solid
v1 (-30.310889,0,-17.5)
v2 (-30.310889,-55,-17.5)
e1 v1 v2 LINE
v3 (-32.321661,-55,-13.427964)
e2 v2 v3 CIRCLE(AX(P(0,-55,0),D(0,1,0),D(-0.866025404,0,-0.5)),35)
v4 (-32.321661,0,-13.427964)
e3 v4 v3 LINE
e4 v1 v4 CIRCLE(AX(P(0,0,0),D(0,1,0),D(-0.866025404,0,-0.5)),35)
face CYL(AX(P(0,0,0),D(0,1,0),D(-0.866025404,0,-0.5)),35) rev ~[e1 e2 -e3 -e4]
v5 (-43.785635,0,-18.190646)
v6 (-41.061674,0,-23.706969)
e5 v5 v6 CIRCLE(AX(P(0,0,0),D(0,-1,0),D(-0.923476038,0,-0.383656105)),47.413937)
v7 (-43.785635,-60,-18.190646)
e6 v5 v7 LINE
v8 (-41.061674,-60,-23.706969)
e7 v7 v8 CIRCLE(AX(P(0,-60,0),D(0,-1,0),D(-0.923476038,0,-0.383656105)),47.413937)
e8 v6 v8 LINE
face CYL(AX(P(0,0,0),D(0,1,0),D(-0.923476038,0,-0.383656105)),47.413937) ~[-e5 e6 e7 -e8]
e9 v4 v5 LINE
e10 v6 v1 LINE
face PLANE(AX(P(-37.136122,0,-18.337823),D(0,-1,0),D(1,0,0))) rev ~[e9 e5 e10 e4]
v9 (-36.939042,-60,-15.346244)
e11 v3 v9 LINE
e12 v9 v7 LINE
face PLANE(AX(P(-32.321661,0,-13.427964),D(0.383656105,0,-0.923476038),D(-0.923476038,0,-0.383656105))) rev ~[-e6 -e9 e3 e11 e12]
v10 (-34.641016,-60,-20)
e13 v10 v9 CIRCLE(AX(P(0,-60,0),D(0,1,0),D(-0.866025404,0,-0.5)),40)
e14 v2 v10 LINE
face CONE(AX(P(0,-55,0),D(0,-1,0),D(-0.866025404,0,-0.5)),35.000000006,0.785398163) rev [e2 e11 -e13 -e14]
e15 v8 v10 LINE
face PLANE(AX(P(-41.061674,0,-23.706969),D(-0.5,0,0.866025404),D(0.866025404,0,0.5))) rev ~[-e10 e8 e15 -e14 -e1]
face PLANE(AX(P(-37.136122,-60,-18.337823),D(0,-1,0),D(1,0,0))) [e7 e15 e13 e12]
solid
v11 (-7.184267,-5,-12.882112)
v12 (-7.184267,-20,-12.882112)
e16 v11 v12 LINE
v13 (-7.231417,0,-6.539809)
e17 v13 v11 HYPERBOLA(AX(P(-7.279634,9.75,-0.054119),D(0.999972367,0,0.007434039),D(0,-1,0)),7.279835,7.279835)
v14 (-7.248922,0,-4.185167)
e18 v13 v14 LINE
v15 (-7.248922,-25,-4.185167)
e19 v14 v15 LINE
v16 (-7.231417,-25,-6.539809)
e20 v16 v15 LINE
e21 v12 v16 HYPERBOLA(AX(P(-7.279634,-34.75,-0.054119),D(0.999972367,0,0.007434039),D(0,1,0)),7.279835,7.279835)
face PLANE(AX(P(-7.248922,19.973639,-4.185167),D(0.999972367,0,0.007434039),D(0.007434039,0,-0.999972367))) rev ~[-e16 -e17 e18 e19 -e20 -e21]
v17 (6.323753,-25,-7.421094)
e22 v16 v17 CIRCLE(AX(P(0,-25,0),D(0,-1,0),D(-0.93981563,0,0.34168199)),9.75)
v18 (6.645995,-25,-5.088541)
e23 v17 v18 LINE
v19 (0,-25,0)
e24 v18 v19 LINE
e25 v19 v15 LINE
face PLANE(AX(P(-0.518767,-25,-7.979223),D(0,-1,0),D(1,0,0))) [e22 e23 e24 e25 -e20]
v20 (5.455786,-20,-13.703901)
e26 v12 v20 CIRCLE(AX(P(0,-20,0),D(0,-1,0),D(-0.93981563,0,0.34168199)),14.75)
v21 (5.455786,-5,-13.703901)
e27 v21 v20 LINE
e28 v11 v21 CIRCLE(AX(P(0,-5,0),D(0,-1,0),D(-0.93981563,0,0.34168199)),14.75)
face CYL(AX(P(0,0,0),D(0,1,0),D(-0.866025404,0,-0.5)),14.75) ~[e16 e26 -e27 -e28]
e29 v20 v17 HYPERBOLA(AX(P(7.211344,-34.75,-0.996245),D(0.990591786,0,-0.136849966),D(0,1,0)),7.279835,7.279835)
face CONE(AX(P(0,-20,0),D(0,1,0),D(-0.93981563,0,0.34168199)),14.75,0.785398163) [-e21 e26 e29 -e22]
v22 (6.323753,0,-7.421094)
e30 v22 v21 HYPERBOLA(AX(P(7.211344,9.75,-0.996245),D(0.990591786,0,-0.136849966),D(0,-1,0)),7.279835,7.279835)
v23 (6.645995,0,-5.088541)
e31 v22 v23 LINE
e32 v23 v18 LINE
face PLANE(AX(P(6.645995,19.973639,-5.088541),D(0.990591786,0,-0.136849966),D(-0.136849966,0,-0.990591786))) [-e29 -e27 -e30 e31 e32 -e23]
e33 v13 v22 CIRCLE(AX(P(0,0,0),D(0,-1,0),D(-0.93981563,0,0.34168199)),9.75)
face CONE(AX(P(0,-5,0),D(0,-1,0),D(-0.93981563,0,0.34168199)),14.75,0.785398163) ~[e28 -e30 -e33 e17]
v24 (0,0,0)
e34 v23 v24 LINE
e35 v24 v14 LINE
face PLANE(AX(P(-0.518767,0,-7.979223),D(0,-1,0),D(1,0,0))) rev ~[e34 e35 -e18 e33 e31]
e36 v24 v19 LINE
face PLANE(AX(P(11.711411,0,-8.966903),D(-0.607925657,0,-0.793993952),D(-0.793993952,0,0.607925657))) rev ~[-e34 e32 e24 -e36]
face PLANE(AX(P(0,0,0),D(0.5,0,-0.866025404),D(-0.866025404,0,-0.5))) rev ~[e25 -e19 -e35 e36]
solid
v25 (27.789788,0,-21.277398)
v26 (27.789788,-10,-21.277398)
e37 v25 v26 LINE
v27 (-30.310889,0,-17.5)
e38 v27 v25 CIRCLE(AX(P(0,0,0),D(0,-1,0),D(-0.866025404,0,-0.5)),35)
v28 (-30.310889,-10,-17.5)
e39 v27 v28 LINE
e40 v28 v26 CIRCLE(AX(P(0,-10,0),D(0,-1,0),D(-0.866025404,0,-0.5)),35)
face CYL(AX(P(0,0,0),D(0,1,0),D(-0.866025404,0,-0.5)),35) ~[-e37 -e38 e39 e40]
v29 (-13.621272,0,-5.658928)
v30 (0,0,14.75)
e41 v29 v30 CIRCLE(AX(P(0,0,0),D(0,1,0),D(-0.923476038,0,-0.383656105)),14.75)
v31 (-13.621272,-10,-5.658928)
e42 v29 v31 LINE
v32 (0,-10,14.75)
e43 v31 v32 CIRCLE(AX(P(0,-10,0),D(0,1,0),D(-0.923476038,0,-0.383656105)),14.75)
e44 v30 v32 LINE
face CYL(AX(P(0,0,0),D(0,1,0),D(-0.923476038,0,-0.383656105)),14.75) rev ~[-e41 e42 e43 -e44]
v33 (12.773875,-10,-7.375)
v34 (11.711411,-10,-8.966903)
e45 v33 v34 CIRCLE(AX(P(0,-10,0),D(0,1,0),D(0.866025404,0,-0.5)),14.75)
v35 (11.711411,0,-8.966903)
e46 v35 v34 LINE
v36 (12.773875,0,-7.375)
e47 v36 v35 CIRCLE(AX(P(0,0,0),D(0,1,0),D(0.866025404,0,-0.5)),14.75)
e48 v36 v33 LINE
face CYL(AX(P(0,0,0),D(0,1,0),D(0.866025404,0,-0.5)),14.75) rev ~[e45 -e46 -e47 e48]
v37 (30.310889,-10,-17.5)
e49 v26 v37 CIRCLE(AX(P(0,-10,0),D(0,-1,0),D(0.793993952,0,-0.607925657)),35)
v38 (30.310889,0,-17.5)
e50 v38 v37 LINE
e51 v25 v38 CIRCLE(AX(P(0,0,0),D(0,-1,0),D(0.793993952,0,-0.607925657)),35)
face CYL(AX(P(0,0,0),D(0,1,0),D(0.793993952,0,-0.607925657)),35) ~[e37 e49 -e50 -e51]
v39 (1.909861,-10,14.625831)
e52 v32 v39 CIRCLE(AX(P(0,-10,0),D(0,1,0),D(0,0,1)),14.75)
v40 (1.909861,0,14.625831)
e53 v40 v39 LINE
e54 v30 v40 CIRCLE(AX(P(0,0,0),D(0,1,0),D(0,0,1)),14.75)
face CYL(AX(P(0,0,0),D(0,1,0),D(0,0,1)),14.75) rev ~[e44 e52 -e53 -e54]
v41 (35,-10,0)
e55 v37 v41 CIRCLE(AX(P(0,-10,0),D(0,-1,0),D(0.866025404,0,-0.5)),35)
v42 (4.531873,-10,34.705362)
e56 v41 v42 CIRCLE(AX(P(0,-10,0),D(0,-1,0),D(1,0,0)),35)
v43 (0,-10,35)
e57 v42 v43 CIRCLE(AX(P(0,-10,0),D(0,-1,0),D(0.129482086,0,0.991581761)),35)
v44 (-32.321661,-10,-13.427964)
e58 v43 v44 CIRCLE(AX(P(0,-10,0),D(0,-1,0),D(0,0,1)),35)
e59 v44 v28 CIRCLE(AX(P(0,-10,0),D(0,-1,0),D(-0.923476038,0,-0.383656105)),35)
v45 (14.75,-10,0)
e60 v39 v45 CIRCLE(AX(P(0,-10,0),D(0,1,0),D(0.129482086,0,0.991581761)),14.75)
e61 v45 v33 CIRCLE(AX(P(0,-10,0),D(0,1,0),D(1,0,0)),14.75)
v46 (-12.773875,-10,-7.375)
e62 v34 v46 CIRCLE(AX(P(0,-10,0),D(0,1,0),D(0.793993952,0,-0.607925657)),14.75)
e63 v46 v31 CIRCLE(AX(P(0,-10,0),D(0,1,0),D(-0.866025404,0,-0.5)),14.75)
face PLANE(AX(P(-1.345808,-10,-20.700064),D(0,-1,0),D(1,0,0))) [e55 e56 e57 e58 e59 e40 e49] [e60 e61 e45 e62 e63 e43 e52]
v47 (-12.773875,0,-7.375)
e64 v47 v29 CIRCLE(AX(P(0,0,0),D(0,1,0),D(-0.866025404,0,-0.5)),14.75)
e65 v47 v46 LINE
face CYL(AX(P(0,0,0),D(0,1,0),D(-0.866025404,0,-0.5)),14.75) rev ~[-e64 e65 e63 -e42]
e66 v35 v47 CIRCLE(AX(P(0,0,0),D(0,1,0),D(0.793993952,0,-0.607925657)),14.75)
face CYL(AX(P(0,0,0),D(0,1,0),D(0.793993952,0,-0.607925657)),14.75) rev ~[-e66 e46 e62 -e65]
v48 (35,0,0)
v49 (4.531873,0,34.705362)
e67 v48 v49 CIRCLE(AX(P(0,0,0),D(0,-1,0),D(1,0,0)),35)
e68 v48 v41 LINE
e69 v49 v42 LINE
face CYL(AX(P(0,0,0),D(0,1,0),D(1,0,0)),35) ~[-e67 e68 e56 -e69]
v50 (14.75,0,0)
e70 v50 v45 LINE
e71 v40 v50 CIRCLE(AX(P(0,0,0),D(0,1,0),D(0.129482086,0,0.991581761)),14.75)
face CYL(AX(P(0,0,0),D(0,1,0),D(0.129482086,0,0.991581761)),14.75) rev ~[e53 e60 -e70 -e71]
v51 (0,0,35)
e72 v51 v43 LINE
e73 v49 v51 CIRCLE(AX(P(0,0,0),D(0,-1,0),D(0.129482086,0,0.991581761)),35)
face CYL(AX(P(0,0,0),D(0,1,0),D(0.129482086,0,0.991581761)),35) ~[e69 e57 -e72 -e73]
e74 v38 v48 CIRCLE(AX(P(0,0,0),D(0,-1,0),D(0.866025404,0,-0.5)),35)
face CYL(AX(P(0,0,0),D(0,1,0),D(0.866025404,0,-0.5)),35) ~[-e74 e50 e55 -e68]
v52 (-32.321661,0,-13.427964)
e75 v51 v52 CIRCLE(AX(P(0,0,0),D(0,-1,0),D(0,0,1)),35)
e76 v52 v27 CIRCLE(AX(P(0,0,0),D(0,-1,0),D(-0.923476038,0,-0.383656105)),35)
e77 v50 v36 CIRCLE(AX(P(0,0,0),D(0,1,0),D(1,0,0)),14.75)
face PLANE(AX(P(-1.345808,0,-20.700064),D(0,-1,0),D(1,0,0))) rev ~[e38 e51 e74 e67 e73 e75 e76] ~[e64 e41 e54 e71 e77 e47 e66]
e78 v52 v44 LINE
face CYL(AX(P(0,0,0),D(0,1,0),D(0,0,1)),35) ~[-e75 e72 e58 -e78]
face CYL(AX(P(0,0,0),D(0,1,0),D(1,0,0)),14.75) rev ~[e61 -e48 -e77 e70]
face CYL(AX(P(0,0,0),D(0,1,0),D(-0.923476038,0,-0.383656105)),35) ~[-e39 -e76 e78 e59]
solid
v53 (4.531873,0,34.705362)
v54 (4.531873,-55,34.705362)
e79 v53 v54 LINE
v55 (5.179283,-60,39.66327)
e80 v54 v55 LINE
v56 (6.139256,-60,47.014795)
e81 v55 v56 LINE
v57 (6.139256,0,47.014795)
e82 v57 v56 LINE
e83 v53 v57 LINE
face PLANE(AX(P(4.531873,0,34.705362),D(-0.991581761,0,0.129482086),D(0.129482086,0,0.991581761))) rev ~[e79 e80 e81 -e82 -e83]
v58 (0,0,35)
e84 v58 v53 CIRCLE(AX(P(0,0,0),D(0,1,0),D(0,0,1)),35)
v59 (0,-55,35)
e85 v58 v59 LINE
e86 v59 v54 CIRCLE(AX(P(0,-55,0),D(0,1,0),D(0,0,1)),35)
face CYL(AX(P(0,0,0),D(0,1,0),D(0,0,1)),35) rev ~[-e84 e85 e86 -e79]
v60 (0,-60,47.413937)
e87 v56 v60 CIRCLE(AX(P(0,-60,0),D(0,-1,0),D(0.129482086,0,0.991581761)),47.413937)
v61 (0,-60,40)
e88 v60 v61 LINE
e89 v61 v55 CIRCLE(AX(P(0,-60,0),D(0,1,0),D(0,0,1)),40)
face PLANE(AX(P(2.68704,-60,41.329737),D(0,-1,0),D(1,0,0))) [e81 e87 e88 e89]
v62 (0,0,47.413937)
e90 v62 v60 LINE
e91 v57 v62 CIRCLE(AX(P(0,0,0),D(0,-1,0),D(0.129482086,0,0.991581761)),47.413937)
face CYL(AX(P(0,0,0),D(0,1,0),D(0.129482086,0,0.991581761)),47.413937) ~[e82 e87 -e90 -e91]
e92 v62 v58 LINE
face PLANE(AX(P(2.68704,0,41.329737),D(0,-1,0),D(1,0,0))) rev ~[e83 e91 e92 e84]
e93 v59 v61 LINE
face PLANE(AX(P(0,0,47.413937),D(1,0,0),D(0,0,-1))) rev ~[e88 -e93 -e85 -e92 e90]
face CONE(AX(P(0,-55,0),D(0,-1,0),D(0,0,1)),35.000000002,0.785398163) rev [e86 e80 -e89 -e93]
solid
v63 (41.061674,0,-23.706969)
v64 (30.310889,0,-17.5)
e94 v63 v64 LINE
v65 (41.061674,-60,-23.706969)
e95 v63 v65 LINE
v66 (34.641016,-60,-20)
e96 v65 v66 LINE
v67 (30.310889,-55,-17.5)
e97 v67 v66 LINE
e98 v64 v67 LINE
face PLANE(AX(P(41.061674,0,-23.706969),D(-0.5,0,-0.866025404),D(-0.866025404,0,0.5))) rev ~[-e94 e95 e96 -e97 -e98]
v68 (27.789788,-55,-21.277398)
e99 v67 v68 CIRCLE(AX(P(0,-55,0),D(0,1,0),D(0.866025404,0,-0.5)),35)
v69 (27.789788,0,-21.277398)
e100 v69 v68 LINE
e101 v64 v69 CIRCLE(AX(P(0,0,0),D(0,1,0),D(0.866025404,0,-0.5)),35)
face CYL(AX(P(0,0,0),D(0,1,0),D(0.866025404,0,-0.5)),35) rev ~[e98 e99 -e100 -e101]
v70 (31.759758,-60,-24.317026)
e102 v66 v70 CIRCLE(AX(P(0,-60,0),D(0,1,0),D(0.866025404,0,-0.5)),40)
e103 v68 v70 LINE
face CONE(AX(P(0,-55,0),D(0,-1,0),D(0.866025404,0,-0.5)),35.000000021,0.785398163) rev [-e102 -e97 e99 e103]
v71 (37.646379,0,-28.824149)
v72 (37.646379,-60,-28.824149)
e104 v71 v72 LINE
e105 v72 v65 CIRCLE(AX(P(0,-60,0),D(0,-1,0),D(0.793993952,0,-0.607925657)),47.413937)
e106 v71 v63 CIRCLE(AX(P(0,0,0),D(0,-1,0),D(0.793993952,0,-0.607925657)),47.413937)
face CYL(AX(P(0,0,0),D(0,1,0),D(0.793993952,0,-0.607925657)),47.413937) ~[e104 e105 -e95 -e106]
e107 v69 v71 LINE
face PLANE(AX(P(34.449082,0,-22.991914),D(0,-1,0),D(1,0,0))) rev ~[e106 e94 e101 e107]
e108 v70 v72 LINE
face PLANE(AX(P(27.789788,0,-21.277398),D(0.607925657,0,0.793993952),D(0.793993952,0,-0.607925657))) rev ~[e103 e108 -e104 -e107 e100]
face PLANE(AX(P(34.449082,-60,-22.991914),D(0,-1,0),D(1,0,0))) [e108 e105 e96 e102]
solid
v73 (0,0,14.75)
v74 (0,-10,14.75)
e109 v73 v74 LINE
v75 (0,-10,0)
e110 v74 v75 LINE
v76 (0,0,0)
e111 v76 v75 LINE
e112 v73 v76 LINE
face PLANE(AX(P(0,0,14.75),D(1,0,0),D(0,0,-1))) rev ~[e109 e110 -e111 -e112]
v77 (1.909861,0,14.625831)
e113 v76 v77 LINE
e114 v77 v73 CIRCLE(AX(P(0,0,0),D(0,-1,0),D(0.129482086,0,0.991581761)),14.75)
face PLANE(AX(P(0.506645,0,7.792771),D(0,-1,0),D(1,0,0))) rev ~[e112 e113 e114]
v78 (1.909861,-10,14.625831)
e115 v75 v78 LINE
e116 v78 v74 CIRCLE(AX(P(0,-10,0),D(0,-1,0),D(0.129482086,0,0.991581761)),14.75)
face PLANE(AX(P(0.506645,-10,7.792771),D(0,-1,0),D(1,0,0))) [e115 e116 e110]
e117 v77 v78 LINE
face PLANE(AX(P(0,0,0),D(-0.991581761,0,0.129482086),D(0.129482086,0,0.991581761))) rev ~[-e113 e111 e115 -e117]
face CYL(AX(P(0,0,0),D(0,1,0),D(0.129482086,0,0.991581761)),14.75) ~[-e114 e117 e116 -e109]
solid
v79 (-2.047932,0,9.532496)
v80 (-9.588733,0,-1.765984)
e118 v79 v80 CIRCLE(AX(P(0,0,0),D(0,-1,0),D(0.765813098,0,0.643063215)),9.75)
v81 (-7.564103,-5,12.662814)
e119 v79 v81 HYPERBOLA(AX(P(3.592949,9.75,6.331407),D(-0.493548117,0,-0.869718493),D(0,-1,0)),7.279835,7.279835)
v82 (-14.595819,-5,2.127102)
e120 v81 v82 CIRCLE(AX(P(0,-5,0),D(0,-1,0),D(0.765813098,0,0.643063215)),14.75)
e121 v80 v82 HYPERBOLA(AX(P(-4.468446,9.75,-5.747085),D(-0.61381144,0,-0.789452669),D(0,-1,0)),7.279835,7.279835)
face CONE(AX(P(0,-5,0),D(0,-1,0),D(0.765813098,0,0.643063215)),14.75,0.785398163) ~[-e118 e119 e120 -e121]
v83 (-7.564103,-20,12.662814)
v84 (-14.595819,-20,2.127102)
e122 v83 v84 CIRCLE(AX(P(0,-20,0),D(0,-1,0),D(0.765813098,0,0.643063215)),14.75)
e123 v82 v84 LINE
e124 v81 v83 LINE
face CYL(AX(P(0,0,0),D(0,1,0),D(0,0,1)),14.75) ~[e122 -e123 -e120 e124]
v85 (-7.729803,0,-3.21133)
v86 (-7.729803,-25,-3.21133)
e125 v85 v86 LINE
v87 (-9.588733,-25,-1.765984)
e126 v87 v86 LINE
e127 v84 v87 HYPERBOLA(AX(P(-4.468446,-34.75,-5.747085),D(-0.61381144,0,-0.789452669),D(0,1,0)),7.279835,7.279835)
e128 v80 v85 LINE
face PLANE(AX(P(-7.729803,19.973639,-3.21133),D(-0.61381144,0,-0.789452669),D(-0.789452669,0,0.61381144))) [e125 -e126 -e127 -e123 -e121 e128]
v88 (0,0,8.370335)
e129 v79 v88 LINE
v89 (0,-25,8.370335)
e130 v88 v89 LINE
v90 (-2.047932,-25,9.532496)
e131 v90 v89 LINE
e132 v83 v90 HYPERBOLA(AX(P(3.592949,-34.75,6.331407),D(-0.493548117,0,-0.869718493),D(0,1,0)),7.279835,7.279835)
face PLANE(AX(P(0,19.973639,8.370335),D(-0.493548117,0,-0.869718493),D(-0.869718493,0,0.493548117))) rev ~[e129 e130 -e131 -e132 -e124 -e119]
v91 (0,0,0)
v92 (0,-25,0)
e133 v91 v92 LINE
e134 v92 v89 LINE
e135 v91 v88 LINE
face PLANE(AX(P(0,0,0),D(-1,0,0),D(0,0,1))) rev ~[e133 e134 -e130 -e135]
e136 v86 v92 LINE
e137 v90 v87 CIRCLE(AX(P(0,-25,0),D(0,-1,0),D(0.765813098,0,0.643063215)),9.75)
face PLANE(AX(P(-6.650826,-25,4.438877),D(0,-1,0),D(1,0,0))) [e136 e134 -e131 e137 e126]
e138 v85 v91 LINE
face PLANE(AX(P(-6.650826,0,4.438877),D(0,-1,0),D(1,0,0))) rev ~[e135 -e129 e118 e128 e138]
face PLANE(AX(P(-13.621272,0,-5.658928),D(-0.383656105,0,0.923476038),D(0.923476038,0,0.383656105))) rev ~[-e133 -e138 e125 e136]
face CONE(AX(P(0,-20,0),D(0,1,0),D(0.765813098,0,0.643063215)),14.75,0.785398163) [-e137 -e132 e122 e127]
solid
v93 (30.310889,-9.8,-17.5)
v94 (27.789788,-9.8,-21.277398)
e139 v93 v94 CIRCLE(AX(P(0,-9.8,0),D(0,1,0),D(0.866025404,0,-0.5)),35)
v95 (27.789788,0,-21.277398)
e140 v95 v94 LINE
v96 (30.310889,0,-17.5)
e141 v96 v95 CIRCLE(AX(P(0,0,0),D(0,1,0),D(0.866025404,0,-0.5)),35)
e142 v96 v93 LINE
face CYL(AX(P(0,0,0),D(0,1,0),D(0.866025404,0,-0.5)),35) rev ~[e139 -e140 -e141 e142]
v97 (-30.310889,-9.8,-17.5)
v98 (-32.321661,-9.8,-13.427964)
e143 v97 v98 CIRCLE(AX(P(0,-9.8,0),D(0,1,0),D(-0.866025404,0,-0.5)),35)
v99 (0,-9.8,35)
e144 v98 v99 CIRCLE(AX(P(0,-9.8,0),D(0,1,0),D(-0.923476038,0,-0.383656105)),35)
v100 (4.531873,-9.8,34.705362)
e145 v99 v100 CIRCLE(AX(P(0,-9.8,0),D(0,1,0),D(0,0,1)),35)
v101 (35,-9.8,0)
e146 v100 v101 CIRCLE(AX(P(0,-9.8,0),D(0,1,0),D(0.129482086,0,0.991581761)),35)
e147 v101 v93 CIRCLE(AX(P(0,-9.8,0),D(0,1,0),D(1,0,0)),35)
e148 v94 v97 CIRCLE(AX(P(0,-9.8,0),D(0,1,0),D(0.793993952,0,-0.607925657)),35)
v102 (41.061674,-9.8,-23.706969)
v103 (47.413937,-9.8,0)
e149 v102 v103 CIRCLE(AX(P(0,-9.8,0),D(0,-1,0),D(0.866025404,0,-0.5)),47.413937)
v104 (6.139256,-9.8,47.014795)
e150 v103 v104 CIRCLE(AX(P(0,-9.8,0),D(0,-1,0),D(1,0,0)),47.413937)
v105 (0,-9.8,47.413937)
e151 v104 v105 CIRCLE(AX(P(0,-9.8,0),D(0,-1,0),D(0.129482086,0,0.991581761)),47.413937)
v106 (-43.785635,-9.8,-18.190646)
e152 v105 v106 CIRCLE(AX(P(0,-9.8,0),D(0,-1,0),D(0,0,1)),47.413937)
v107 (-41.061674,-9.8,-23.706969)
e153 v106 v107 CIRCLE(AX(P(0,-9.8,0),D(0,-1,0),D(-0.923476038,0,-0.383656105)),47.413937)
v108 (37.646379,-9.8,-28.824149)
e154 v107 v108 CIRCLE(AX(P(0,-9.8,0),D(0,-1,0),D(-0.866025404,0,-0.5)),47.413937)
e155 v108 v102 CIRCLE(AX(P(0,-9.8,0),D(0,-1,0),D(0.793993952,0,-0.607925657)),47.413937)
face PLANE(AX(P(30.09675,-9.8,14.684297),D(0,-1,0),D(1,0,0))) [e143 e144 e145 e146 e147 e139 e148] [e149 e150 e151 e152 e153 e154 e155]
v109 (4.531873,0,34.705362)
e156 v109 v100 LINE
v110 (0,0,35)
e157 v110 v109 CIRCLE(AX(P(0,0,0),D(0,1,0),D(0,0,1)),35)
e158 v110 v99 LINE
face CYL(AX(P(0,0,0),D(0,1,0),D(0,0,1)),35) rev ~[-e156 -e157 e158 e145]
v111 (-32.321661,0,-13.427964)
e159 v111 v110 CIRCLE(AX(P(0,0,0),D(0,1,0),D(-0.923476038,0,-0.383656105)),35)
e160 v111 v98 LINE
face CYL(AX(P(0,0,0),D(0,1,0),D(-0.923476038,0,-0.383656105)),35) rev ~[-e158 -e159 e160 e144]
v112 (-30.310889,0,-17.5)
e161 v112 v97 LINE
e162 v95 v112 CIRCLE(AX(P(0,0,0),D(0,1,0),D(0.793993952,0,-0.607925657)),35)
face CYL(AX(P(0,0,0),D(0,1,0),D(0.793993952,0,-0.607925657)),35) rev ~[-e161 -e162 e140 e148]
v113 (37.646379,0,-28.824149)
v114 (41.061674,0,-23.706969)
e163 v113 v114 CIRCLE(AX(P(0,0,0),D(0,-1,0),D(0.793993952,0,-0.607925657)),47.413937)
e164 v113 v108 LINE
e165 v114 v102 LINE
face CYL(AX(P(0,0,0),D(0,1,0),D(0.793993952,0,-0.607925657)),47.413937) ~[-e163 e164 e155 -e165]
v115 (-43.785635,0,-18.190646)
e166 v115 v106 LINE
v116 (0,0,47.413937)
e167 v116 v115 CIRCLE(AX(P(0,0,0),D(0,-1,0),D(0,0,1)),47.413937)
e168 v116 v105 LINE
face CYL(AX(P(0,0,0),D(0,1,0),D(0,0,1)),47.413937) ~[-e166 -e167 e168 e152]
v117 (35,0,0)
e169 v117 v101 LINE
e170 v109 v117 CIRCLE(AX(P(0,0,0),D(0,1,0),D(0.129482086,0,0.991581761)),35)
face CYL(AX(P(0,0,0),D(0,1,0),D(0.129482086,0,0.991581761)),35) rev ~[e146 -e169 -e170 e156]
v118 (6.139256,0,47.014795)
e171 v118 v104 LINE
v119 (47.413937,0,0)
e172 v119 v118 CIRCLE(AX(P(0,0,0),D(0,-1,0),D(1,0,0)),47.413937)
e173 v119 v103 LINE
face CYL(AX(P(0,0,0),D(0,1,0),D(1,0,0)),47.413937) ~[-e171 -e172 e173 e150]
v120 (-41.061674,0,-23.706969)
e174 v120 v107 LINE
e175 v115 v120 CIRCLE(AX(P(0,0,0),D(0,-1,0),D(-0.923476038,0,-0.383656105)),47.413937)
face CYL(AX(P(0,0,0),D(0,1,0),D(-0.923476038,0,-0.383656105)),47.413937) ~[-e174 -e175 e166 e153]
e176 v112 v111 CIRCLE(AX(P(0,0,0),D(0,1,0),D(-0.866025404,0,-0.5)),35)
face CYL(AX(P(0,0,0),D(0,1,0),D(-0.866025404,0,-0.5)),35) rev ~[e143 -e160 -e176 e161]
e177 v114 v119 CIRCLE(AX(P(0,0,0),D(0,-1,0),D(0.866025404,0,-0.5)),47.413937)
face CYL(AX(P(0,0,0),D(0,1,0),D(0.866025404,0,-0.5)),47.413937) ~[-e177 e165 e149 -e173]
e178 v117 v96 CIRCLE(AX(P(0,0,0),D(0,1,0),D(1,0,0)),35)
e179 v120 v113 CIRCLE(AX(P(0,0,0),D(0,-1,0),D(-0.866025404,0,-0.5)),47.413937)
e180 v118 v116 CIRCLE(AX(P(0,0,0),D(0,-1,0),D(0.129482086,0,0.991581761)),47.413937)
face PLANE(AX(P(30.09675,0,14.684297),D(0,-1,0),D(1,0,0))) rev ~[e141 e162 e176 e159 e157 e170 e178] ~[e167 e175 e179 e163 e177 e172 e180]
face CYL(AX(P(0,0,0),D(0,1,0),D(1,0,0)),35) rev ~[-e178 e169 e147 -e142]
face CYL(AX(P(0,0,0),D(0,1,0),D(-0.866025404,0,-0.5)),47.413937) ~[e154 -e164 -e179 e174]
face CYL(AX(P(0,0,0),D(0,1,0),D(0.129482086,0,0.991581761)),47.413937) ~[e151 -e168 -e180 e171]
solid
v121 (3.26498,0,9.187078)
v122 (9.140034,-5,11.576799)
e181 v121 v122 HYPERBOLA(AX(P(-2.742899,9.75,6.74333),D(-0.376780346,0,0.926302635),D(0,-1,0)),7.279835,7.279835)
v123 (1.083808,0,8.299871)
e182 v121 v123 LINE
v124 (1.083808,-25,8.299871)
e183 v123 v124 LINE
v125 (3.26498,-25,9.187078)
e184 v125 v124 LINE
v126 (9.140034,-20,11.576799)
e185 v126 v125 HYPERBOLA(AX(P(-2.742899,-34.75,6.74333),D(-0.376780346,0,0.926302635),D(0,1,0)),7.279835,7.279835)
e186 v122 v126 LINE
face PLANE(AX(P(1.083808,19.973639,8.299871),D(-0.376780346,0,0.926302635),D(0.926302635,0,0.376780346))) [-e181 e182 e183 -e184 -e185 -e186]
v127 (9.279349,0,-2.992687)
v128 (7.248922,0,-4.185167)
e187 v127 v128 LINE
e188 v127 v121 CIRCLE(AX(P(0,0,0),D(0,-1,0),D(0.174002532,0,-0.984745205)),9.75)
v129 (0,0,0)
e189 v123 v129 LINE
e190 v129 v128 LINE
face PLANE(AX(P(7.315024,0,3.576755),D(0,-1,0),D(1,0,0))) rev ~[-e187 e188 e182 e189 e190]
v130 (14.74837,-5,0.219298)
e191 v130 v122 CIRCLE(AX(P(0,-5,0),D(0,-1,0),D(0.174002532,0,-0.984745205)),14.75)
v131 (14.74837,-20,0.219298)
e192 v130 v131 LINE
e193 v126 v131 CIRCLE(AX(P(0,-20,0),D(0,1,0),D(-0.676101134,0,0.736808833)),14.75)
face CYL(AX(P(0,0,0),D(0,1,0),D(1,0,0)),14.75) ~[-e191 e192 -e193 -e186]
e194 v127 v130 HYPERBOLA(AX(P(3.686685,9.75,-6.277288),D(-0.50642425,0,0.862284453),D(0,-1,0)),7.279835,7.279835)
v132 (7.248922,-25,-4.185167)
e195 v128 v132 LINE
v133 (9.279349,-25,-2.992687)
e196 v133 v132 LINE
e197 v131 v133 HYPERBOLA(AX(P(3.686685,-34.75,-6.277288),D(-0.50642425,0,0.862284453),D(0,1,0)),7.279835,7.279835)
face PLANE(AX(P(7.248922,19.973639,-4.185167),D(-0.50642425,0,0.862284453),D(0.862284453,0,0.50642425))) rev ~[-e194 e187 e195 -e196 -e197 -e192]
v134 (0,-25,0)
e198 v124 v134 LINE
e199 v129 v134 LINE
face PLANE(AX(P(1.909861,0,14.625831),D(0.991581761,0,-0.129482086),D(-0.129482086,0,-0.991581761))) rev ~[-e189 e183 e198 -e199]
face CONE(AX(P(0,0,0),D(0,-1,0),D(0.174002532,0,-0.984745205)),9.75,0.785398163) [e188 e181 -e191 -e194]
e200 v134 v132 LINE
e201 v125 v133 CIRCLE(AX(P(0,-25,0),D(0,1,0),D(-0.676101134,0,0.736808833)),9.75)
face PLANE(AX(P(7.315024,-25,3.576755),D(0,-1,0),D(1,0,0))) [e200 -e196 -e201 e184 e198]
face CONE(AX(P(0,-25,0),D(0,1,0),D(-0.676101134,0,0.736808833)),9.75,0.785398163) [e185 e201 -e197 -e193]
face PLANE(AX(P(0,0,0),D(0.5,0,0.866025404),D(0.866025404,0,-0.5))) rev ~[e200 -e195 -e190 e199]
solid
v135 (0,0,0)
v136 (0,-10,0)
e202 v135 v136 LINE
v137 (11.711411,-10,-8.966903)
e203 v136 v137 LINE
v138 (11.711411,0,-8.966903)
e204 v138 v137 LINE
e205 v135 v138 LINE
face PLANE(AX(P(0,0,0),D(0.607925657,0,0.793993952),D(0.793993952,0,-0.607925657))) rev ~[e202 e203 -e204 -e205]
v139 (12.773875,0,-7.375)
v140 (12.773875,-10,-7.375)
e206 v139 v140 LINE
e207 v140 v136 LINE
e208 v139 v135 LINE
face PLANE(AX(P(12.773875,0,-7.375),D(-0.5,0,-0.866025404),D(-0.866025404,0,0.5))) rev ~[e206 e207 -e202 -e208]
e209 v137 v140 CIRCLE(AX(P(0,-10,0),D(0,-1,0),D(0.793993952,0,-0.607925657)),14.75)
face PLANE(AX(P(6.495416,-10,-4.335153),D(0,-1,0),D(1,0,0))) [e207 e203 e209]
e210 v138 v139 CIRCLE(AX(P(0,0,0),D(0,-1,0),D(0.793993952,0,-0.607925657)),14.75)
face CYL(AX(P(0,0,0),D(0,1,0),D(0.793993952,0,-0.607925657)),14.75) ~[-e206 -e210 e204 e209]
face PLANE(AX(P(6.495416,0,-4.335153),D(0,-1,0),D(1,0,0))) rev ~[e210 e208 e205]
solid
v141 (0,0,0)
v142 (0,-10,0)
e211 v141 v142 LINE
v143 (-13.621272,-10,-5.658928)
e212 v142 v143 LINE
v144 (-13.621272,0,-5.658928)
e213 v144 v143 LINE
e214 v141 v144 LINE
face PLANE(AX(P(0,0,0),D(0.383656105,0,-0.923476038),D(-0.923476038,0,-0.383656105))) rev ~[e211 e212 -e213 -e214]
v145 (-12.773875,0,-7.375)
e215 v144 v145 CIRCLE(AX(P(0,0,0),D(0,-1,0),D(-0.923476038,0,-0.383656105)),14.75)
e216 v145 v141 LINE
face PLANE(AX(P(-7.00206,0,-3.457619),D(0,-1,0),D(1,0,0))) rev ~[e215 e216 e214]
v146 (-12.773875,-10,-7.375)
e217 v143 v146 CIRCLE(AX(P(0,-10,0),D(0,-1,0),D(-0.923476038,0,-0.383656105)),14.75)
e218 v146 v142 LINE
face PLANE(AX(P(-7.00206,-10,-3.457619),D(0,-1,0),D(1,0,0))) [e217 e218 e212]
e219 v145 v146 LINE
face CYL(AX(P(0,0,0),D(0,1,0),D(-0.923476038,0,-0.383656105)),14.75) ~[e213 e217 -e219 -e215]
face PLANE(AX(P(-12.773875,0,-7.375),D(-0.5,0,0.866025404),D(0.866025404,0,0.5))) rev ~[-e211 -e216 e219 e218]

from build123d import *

# Parameters (mm, degrees)
F1_DEPTH      = 60
F2_DEPTH      = 9.8
F3_DEPTH      = 25
F4_DEPTH      = 10
F5_DEPTH      = 10
F6_T1_DEPTH   = 64.9472775058
F6_T4_ANGLE   = 212.5191011757
F6_T6_ANGLE   = 212.5191011757
F6_2_T1_DEPTH = 64.9472775058
F6_2_T4_ANGLE = 212.5191011757
F6_2_T6_ANGLE = 212.5191011757
F6_3_T1_DEPTH = 64.9472775058
F6_3_T4_ANGLE = 212.5191011757
F6_3_T6_ANGLE = 212.5191011757
F7_SIZE       = 5
F7_2_SIZE     = 5
F7_3_SIZE     = 5


# Not quite as in the source:
# - a fillet or chamfer that OpenCascade refuses, or shapes differently, is made with other operations: its cross-section is extruded or revolved along the edge and cut away or added


with BuildPart() as f1:
    # F0 (on Front) → F1 (new body)
    with BuildSketch(Plane.XZ):
        with BuildLine():
            ThreePointArc((0, 35), (2.2707204157, 34.9262627373), (4.5318730195, 34.7053616454))
            Line((4.5318730195, 34.7053616454), (6.1392555161, 47.0147954288))
            ThreePointArc((6.1392555161, 47.0147954288), (3.0761084385, 47.3140465864), (0, 47.4139372706))
            Line((0, 47.4139372706), (0, 35))
        make_face()
    extrude(amount=F1_DEPTH)

    # F7
    f7_edges = [f1.edges().sort_by_distance(p)[0] for p in [
        (2.27072, -60, 34.926263),
    ]]
    chamfer(f7_edges, length=F7_SIZE)


with BuildPart() as f1b:
    # F0 (on Front) → F1, piece 2 (new body)
    with BuildSketch(Plane.XZ):
        with BuildLine():
            Line((41.0616741698, -23.7069686353), (30.3108891325, -17.5))
            ThreePointArc((30.3108891325, -17.5), (29.1116705819, -19.4296329335), (27.7897883227, -21.2773979843))
            Line((27.7897883227, -21.2773979843), (37.646379437, -28.8241489517))
            ThreePointArc((37.646379437, -28.8241489517), (39.4371120804, -26.3210113457), (41.0616741698, -23.7069686353))
        make_face()
    extrude(amount=F1_DEPTH)

    # F7#2
    f7_2_edges = [f1b.edges().sort_by_distance(p)[0] for p in [
        (29.111671, -60, -19.429633),
    ]]
    chamfer(f7_2_edges, length=F7_2_SIZE)


with BuildPart() as f1c:
    # F0 (on Front) → F1, piece 3 (new body)
    with BuildSketch(Plane.XZ):
        with BuildLine():
            ThreePointArc((-30.3108891325, -17.5), (-31.3823909976, -15.4966298038), (-32.3216613422, -13.4279636611))
            Line((-32.3216613422, -13.4279636611), (-43.7856349531, -18.1906464771))
            ThreePointArc((-43.7856349531, -18.1906464771), (-42.5132205189, -20.9930352406), (-41.0616741698, -23.7069686353))
            Line((-41.0616741698, -23.7069686353), (-30.3108891325, -17.5))
        make_face()
    extrude(amount=F1_DEPTH)

    # F7#3
    f7_3_edges = [f1c.edges().sort_by_distance(p)[0] for p in [
        (-31.382391, -60, -15.49663),
    ]]
    chamfer(f7_3_edges, length=F7_3_SIZE)


with BuildPart() as f2:
    # F0 (on Front) → F2 (new body)
    with BuildSketch(Plane.XZ):
        with BuildLine():
            ThreePointArc((4.5318730195, 34.7053616454), (26.3022390271, 23.0909554189), (35, 0))
            ThreePointArc((35, 0), (33.8074039201, -9.0586665786), (30.3108891325, -17.5))
            Line((30.3108891325, -17.5), (41.0616741698, -23.7069686353))
            ThreePointArc((41.0616741698, -23.7069686353), (45.7983465358, -12.2716299689), (47.4139372706, 0))
            ThreePointArc((47.4139372706, 0), (35.6312203232, 31.2809460501), (6.1392555161, 47.0147954288))
            Line((6.1392555161, 47.0147954288), (4.5318730195, 34.7053616454))
        make_face()
        with BuildLine():
            ThreePointArc((0, 35), (2.2707204157, 34.9262627373), (4.5318730195, 34.7053616454))
            Line((4.5318730195, 34.7053616454), (6.1392555161, 47.0147954288))
            ThreePointArc((6.1392555161, 47.0147954288), (3.0761084385, 47.3140465864), (0, 47.4139372706))
            Line((0, 47.4139372706), (0, 35))
        make_face()
        with BuildLine():
            Line((41.0616741698, -23.7069686353), (30.3108891325, -17.5))
            ThreePointArc((30.3108891325, -17.5), (29.1116705819, -19.4296329335), (27.7897883227, -21.2773979843))
            Line((27.7897883227, -21.2773979843), (37.646379437, -28.8241489517))
            ThreePointArc((37.646379437, -28.8241489517), (39.4371120804, -26.3210113457), (41.0616741698, -23.7069686353))
        make_face()
        with BuildLine():
            ThreePointArc((-32.3216613422, -13.4279636611), (-29.1116705819, 19.4296329335), (0, 35))
            Line((0, 35), (0, 47.4139372706))
            ThreePointArc((0, 47.4139372706), (-39.4371120804, 26.3210113457), (-43.7856349531, -18.1906464771))
            Line((-43.7856349531, -18.1906464771), (-32.3216613422, -13.4279636611))
        make_face()
        with BuildLine():
            Line((37.646379437, -28.8241489517), (27.7897883227, -21.2773979843))
            ThreePointArc((27.7897883227, -21.2773979843), (-2.2707204157, -34.9262627373), (-30.3108891325, -17.5))
            Line((-30.3108891325, -17.5), (-41.0616741698, -23.7069686353))
            ThreePointArc((-41.0616741698, -23.7069686353), (-3.0761084385, -47.3140465864), (37.646379437, -28.8241489517))
        make_face()
        with BuildLine():
            ThreePointArc((-30.3108891325, -17.5), (-31.3823909976, -15.4966298038), (-32.3216613422, -13.4279636611))
            Line((-32.3216613422, -13.4279636611), (-43.7856349531, -18.1906464771))
            ThreePointArc((-43.7856349531, -18.1906464771), (-42.5132205189, -20.9930352406), (-41.0616741698, -23.7069686353))
            Line((-41.0616741698, -23.7069686353), (-30.3108891325, -17.5))
        make_face()
    extrude(amount=F2_DEPTH)


with BuildPart() as f3:
    # F0 (on Front) → F3 (new body)
    with BuildSketch(Plane.XZ):
        with BuildLine():
            Line((0, 0), (0, 14.75))
            ThreePointArc((0, 14.75), (-12.2684897452, 8.1882024506), (-13.6212715656, -5.6589275429))
            Line((-13.6212715656, -5.6589275429), (0, 0))
        make_face()
    extrude(amount=F3_DEPTH)

    # F6: chamfer of 5 on 4 edges, made by hand

    # F6_s2 → F6_t1 (cut)
    with BuildSketch(Plane.XZ.offset(-19.9736387529)):
        with BuildLine():
            Line((0, 8.3703345214), (-7.5641025641, 12.6628137631))
            ThreePointArc((-7.5641025641, 12.6628137631), (-3.9937030678, 14.1990434821), (0, 14.75))
            Line((0, 14.75), (0, 8.3703345214))
        make_face()
        with BuildLine():
            Line((-7.7298033635, -3.2113299367), (-14.5958192129, 2.1271016679))
            ThreePointArc((-14.5958192129, 2.1271016679), (-14.6446849851, -1.759460624), (-13.6212715656, -5.6589275429))
            Line((-13.6212715656, -5.6589275429), (-7.7298033635, -3.2113299367))
        make_face()
    extrude(amount=F6_T1_DEPTH, mode=Mode.SUBTRACT)

    # F6_s3 → F6_t4 (revolve, cut)
    with BuildSketch(Plane(origin=(0, 0, 0), x_dir=(0, 1, 0), z_dir=(0.6430632155, 0, -0.7658130979))):
        Polygon((-5, 14.75), (0, 9.75), (0, 14.75), align=None)
    revolve(axis=Axis((0, 0, 0), (0, -1, 0)), revolution_arc=F6_T4_ANGLE, mode=Mode.SUBTRACT)

    # F6_s5 → F6_t6 (revolve, cut)
    with BuildSketch(Plane(origin=(0, 0, 0), x_dir=(0, 1, 0), z_dir=(0.6430632155, 0, -0.7658130979))):
        Polygon((-20, 14.75), (-25, 9.75), (-25, 14.75), align=None)
    revolve(axis=Axis((0, -25, 0), (0, -1, 0)), revolution_arc=F6_T6_ANGLE, mode=Mode.SUBTRACT)


with BuildPart() as f3b:
    # F0 (on Front) → F3, piece 2 (new body)
    with BuildSketch(Plane.XZ):
        with BuildLine():
            ThreePointArc((14.75, 0), (11.0845150186, 9.7311883551), (1.9098607725, 14.6258309791))
            Line((1.9098607725, 14.6258309791), (0, 0))
            Line((0, 0), (12.7738747058, -7.375))
            ThreePointArc((12.7738747058, -7.375), (14.2474059378, -3.8175809153), (14.75, 0))
        make_face()
    extrude(amount=F3_DEPTH)

    # F6#2: chamfer of 5 on 4 edges, made by hand

    # F6_2_s2 → F6_2_t1 (cut)
    with BuildSketch(Plane.XZ.offset(-19.9736387529)):
        with BuildLine():
            Line((7.2489223337, -4.1851672607), (14.7483696843, 0.2192980958))
            ThreePointArc((14.7483696843, 0.2192980958), (14.2935838988, -3.6408734291), (12.7738747058, -7.375))
            Line((12.7738747058, -7.375), (7.2489223337, -4.1851672607))
        make_face()
        with BuildLine():
            Line((1.0838083766, 8.2998710474), (9.1400336873, 11.5767993934))
            ThreePointArc((9.1400336873, 11.5767993934), (5.7986048952, 13.5623995395), (1.9098607725, 14.6258309791))
            Line((1.9098607725, 14.6258309791), (1.0838083766, 8.2998710474))
        make_face()
    extrude(amount=F6_2_T1_DEPTH, mode=Mode.SUBTRACT)

    # F6_2_s3 → F6_2_t4 (revolve, cut)
    with BuildSketch(Plane(origin=(0, 0, 0), x_dir=(0, 1, 0), z_dir=(-0.7368088334, 0, -0.6761011337))):
        Polygon((-25, -9.75), (-20, -14.75), (-25, -14.75), align=None)
    revolve(axis=Axis((0, -25, 0), (0, 1, 0)), revolution_arc=F6_2_T4_ANGLE, mode=Mode.SUBTRACT)

    # F6_2_s5 → F6_2_t6 (revolve, cut)
    with BuildSketch(Plane(origin=(0, 0, 0), x_dir=(0, 1, 0), z_dir=(-0.9847452051, 0, -0.1740025319))):
        Polygon((0, 9.75), (-5, 14.75), (0, 14.75), align=None)
    revolve(axis=Axis((0, 0, 0), (0, -1, 0)), revolution_arc=F6_2_T6_ANGLE, mode=Mode.SUBTRACT)


with BuildPart() as f3c:
    # F0 (on Front) → F3, piece 3 (new body)
    with BuildSketch(Plane.XZ):
        with BuildLine():
            Line((11.7114107931, -8.9669034362), (0, 0))
            Line((0, 0), (-12.7738747058, -7.375))
            ThreePointArc((-12.7738747058, -7.375), (-0.9569464609, -14.7189250107), (11.7114107931, -8.9669034362))
        make_face()
    extrude(amount=F3_DEPTH)

    # F6#3: chamfer of 5 on 4 edges, made by hand

    # F6_3_s2 → F6_3_t1 (cut)
    with BuildSketch(Plane.XZ.offset(-19.9736387529)):
        with BuildLine():
            Line((-7.2489223337, -4.1851672607), (-7.1842671202, -12.8821118589))
            ThreePointArc((-7.1842671202, -12.8821118589), (-10.299880831, -10.558170053), (-12.7738747058, -7.375))
            Line((-12.7738747058, -7.375), (-7.2489223337, -4.1851672607))
        make_face()
        with BuildLine():
            Line((6.6459949868, -5.0885411107), (5.4557855256, -13.7039010613))
            ThreePointArc((5.4557855256, -13.7039010613), (8.8460800899, -11.8029389155), (11.7114107931, -8.9669034362))
            Line((11.7114107931, -8.9669034362), (6.6459949868, -5.0885411107))
        make_face()
    extrude(amount=F6_3_T1_DEPTH, mode=Mode.SUBTRACT)

    # F6_3_s3 → F6_3_t4 (revolve, cut)
    with BuildSketch(Plane(origin=(0, 0, 0), x_dir=(0, 1, 0), z_dir=(0.3416819896, 0, 0.9398156298))):
        Polygon((-20, 14.75), (-25, 9.75), (-25, 14.75), align=None)
    revolve(axis=Axis((0, -25, 0), (0, -1, 0)), revolution_arc=F6_3_T4_ANGLE, mode=Mode.SUBTRACT)

    # F6_3_s5 → F6_3_t6 (revolve, cut)
    with BuildSketch(Plane(origin=(0, 0, 0), x_dir=(0, 1, 0), z_dir=(0.3416819896, 0, 0.9398156298))):
        Polygon((-5, 14.75), (0, 9.75), (0, 14.75), align=None)
    revolve(axis=Axis((0, 0, 0), (0, -1, 0)), revolution_arc=F6_3_T6_ANGLE, mode=Mode.SUBTRACT)


with BuildPart() as f4:
    # F0 (on Front) → F4 (new body)
    with BuildSketch(Plane.XZ):
        with BuildLine():
            ThreePointArc((-30.3108891325, -17.5), (-2.2707204157, -34.9262627373), (27.7897883227, -21.2773979843))
            Line((27.7897883227, -21.2773979843), (11.7114107931, -8.9669034362))
            ThreePointArc((11.7114107931, -8.9669034362), (-0.9569464609, -14.7189250107), (-12.7738747058, -7.375))
            Line((-12.7738747058, -7.375), (-30.3108891325, -17.5))
        make_face()
        with BuildLine():
            ThreePointArc((30.3108891325, -17.5), (33.8074039201, -9.0586665786), (35, 0))
            ThreePointArc((35, 0), (26.3022390271, 23.0909554189), (4.5318730195, 34.7053616454))
            Line((4.5318730195, 34.7053616454), (1.9098607725, 14.6258309791))
            ThreePointArc((1.9098607725, 14.6258309791), (11.0845150186, 9.7311883551), (14.75, 0))
            ThreePointArc((14.75, 0), (14.2474059378, -3.8175809153), (12.7738747058, -7.375))
            Line((12.7738747058, -7.375), (30.3108891325, -17.5))
        make_face()
        with BuildLine():
            ThreePointArc((27.7897883227, -21.2773979843), (29.1116705819, -19.4296329335), (30.3108891325, -17.5))
            Line((30.3108891325, -17.5), (12.7738747058, -7.375))
            ThreePointArc((12.7738747058, -7.375), (12.2684897452, -8.1882024506), (11.7114107931, -8.9669034362))
            Line((11.7114107931, -8.9669034362), (27.7897883227, -21.2773979843))
        make_face()
        with BuildLine():
            Line((-13.6212715656, -5.6589275429), (-32.3216613422, -13.4279636611))
            ThreePointArc((-32.3216613422, -13.4279636611), (-31.3823909976, -15.4966298038), (-30.3108891325, -17.5))
            Line((-30.3108891325, -17.5), (-12.7738747058, -7.375))
            ThreePointArc((-12.7738747058, -7.375), (-13.2254362061, -6.5307225602), (-13.6212715656, -5.6589275429))
        make_face()
        with BuildLine():
            Line((0, 14.75), (0, 35))
            ThreePointArc((0, 35), (-29.1116705819, 19.4296329335), (-32.3216613422, -13.4279636611))
            Line((-32.3216613422, -13.4279636611), (-13.6212715656, -5.6589275429))
            ThreePointArc((-13.6212715656, -5.6589275429), (-12.2684897452, 8.1882024506), (0, 14.75))
        make_face()
        with BuildLine():
            Line((1.9098607725, 14.6258309791), (4.5318730195, 34.7053616454))
            ThreePointArc((4.5318730195, 34.7053616454), (2.2707204157, 34.9262627373), (0, 35))
            Line((0, 35), (0, 14.75))
            ThreePointArc((0, 14.75), (0.9569464609, 14.7189250107), (1.9098607725, 14.6258309791))
        make_face()
    extrude(amount=F4_DEPTH)


with BuildPart() as f5:
    # F0 (on Front) → F5 (new body)
    with BuildSketch(Plane.XZ):
        with BuildLine():
            ThreePointArc((11.7114107931, -8.9669034362), (12.2684897452, -8.1882024506), (12.7738747058, -7.375))
            Line((12.7738747058, -7.375), (0, 0))
            Line((0, 0), (11.7114107931, -8.9669034362))
        make_face()
    extrude(amount=F5_DEPTH)


with BuildPart() as f5b:
    # F0 (on Front) → F5, piece 2 (new body)
    with BuildSketch(Plane.XZ):
        with BuildLine():
            Line((-12.7738747058, -7.375), (0, 0))
            Line((0, 0), (-13.6212715656, -5.6589275429))
            ThreePointArc((-13.6212715656, -5.6589275429), (-13.2254362061, -6.5307225602), (-12.7738747058, -7.375))
        make_face()
    extrude(amount=F5_DEPTH)


with BuildPart() as f5c:
    # F0 (on Front) → F5, piece 3 (new body)
    with BuildSketch(Plane.XZ):
        with BuildLine():
            Line((0, 0), (1.9098607725, 14.6258309791))
            ThreePointArc((1.9098607725, 14.6258309791), (0.9569464609, 14.7189250107), (0, 14.75))
            Line((0, 14.75), (0, 0))
        make_face()
    extrude(amount=F5_DEPTH)


solid = Compound([f1.part, f1b.part, f1c.part, f2.part, f3.part, f3b.part, f3c.part, f4.part, f5.part, f5b.part, f5c.part])
